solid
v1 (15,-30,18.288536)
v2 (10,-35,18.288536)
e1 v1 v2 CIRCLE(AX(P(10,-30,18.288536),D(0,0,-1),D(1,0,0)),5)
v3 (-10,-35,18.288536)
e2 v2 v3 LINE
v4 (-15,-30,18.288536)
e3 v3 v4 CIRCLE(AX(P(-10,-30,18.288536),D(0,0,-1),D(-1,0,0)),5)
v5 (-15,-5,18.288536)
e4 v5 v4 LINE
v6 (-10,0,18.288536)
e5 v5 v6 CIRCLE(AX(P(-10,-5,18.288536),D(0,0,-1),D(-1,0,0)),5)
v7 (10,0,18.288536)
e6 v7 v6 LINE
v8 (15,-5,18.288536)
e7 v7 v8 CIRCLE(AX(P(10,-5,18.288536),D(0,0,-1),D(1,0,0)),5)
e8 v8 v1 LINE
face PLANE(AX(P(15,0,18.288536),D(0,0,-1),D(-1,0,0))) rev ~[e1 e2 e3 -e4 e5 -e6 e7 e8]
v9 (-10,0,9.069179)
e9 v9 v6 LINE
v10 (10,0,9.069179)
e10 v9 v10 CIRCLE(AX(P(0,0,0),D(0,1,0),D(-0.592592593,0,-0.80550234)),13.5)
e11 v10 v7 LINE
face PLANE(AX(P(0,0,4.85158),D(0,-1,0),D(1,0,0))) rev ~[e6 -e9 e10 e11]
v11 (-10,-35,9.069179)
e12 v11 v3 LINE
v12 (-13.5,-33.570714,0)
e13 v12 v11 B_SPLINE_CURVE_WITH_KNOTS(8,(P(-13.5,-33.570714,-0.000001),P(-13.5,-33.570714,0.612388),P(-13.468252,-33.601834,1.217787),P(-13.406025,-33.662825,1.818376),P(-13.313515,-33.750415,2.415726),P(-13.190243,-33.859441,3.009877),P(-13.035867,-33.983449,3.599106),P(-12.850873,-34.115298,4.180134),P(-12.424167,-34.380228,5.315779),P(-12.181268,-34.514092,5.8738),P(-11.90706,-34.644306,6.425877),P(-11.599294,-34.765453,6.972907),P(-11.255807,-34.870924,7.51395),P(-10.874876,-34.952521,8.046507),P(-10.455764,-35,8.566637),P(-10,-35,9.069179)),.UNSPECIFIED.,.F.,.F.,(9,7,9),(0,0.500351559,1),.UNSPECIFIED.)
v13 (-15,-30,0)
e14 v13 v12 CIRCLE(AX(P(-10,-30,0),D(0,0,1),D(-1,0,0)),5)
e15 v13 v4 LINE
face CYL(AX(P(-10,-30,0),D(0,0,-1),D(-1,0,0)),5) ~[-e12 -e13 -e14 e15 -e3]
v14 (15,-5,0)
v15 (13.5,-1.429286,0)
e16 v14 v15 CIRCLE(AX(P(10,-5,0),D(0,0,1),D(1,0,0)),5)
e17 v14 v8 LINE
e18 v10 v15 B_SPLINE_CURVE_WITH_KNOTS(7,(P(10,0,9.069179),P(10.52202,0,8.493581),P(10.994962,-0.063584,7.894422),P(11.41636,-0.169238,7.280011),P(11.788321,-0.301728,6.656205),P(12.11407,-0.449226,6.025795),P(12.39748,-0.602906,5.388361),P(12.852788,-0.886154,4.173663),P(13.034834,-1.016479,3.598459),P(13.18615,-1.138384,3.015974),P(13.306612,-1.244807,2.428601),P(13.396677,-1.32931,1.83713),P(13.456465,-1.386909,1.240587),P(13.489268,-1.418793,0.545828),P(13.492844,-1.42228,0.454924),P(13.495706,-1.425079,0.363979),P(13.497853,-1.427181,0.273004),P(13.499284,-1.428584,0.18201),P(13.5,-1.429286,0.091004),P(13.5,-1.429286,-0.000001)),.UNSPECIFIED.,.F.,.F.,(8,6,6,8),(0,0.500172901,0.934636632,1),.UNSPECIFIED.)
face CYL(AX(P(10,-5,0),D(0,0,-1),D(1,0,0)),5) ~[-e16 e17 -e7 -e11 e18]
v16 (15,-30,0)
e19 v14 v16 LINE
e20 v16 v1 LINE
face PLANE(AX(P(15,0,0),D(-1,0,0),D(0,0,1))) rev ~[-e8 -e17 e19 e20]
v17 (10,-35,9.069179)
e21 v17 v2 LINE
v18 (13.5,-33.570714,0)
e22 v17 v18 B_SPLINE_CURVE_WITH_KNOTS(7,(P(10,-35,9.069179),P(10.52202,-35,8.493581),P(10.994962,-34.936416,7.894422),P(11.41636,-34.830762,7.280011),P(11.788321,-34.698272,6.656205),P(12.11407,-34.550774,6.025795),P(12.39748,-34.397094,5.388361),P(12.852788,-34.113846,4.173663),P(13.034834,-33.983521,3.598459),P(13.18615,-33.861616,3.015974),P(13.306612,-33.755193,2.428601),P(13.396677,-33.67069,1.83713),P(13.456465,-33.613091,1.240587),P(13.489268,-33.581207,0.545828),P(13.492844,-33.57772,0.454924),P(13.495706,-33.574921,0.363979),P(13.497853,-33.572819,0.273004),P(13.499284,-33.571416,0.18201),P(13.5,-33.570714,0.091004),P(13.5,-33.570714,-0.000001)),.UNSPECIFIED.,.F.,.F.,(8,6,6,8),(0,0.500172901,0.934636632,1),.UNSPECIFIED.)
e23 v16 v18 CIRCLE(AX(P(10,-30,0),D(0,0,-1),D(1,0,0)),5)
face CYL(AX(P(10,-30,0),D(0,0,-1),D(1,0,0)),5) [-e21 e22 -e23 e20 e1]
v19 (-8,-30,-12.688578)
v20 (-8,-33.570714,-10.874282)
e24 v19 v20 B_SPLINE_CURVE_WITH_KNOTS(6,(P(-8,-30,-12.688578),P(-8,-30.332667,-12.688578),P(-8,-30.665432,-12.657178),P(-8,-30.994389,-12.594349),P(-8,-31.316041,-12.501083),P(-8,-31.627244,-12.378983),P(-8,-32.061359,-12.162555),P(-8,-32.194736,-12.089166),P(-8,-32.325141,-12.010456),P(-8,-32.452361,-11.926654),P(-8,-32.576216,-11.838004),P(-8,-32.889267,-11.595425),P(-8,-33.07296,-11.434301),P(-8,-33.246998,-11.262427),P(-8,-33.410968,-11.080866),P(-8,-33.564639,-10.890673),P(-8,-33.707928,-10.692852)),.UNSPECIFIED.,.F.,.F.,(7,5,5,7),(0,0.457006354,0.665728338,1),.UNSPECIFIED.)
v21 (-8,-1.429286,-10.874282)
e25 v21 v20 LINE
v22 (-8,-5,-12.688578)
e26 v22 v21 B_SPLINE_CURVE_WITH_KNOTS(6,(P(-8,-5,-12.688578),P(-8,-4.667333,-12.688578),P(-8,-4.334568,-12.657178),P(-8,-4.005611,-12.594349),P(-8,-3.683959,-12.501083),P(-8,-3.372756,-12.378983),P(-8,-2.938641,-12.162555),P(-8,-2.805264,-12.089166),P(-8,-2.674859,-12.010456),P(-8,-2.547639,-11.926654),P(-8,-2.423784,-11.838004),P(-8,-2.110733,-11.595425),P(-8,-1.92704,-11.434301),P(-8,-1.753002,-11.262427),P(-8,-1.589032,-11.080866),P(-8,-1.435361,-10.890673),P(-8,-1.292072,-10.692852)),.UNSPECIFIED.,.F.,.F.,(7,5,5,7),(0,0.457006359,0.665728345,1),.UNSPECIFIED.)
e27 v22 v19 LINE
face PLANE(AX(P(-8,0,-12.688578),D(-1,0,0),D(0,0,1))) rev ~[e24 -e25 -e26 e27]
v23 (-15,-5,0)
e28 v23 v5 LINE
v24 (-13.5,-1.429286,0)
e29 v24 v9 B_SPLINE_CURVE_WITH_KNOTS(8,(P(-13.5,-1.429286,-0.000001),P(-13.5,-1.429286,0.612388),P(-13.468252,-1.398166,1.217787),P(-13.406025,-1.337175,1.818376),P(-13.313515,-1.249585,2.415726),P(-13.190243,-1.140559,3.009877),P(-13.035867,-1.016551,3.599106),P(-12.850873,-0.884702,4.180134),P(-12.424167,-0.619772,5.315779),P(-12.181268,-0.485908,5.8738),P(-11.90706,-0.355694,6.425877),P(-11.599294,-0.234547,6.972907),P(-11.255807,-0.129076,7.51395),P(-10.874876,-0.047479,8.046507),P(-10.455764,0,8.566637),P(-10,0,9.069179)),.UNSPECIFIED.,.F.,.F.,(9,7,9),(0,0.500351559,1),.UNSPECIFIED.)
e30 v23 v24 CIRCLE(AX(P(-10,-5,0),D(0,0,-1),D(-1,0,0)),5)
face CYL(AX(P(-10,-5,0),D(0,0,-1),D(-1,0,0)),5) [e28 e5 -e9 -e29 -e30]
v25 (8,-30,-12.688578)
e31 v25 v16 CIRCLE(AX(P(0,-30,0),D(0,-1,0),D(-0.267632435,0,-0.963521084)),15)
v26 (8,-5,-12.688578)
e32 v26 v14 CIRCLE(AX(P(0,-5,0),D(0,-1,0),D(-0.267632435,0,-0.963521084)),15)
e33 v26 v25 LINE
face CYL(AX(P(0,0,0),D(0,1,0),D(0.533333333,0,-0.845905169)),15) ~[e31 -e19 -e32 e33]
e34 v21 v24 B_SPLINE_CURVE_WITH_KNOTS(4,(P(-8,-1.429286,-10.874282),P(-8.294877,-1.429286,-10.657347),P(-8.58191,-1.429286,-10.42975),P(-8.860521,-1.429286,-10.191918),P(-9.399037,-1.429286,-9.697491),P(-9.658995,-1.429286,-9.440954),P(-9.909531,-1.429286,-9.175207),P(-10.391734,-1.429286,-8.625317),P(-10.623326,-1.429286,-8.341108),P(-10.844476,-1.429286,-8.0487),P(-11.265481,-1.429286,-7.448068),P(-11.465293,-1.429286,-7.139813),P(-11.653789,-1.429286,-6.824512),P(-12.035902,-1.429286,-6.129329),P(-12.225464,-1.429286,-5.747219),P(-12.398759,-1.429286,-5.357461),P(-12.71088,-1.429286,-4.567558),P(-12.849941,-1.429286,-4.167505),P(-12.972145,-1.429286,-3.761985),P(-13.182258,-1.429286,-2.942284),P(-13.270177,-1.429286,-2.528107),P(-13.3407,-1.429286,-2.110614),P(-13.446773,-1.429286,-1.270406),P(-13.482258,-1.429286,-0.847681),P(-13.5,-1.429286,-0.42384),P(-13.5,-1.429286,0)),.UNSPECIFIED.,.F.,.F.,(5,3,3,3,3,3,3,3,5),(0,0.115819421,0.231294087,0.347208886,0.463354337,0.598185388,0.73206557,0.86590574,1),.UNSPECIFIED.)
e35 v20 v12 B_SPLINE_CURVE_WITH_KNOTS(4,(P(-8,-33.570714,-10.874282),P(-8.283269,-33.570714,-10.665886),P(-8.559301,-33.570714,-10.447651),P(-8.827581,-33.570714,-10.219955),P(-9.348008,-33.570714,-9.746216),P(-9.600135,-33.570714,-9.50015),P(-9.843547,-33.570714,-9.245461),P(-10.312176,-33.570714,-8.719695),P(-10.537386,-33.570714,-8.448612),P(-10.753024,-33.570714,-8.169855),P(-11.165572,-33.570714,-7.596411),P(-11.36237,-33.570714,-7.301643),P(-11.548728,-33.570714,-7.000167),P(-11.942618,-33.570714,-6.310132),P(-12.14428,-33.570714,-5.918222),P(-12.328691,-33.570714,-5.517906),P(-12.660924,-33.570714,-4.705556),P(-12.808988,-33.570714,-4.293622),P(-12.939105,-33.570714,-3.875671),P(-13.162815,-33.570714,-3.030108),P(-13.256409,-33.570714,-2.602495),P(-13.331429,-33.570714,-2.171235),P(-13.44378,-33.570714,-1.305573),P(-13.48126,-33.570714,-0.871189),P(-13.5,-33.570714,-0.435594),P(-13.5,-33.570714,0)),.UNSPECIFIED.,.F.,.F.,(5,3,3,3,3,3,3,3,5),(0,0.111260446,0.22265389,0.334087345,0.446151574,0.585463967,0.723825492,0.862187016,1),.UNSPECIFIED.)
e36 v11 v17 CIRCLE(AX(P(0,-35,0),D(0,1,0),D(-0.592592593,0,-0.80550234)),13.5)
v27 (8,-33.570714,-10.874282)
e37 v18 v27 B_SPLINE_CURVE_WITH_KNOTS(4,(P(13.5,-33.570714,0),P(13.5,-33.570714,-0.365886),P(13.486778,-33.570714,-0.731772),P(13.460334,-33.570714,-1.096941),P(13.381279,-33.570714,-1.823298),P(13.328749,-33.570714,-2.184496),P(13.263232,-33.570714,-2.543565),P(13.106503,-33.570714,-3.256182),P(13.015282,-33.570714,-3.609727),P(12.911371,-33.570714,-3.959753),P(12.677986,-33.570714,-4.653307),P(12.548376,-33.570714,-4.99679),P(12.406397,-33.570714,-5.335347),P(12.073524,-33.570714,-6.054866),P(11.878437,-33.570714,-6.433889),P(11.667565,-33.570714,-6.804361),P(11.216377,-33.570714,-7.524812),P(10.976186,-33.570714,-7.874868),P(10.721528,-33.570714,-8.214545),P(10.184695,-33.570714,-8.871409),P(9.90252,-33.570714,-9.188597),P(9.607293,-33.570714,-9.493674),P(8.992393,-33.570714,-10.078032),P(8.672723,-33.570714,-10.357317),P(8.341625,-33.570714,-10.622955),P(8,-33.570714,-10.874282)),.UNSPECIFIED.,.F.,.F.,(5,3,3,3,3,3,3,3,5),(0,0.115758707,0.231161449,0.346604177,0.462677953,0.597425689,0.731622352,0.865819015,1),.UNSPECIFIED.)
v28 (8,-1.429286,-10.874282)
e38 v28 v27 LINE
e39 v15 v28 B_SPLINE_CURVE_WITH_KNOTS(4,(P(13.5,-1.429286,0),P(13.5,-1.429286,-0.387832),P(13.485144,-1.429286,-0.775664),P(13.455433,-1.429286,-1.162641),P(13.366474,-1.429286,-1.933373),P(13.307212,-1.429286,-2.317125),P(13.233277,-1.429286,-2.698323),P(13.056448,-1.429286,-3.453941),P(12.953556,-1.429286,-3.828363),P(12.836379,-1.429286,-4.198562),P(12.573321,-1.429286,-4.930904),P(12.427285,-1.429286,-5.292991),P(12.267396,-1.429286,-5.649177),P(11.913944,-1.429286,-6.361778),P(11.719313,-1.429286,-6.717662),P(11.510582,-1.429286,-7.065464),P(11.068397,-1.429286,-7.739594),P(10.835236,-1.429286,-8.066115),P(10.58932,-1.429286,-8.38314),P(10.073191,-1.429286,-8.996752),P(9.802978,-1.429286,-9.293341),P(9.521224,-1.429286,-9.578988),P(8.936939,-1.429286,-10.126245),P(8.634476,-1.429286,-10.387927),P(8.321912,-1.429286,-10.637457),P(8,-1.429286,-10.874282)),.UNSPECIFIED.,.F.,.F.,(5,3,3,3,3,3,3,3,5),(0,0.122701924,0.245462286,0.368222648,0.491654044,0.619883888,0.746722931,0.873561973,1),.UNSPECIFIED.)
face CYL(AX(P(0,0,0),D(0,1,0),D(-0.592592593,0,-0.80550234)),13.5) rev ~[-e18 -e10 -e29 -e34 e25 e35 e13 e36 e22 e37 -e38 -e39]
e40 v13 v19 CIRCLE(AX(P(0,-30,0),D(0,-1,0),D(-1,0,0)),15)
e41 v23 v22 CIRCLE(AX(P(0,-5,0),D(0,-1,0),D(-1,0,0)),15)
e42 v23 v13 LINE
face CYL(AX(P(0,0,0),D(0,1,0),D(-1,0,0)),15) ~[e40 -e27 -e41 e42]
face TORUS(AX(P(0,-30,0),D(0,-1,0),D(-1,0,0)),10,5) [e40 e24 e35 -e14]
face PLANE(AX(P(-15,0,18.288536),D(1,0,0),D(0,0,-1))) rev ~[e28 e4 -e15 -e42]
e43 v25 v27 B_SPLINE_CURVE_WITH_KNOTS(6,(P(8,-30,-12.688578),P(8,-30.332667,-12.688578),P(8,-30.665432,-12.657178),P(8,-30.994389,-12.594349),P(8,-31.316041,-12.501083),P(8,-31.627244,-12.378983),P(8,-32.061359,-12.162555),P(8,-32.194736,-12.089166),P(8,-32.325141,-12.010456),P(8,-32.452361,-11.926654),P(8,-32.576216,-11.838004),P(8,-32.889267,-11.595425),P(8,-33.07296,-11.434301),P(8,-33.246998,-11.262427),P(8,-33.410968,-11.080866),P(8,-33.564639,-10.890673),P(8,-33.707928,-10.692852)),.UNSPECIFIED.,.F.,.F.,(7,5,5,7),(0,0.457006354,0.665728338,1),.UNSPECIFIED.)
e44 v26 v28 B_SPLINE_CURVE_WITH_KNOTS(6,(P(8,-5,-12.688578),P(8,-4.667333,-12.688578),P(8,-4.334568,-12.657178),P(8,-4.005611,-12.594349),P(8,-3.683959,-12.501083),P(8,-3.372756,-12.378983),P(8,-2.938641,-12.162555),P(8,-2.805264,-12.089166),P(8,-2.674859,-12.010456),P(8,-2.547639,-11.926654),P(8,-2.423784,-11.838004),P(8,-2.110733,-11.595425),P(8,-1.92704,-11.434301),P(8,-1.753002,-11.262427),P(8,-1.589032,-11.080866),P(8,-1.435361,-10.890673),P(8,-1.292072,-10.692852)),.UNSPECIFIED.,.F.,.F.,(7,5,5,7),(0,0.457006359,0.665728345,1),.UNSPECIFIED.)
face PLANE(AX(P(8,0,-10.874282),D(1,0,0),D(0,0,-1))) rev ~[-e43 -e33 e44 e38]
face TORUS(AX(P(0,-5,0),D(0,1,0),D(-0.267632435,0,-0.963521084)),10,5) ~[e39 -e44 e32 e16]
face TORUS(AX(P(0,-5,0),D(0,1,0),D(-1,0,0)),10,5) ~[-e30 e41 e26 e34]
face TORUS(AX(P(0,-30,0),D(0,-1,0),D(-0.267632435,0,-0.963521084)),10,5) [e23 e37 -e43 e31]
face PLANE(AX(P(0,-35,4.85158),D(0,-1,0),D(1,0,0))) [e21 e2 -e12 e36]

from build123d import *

# Parameters (mm, degrees)
F1_DEPTH     = 35
F2_T1_DEPTH  = 30.7885359973
F2_T4_ANGLE  = 105.523431357
F2_T6_ANGLE  = 105.523431357
F2_T8_ANGLE  = 105.523431357
F2_T10_ANGLE = 105.523431357


# Not quite as in the source:
# - a fillet or chamfer that OpenCascade refuses, or shapes differently, is made with other operations: its cross-section is extruded or revolved along the edge and cut away or added


with BuildPart() as f1:
    # F0 (on Front) → F1 (new body)
    with BuildSketch(Plane.XZ):
        with BuildLine():
            ThreePointArc((-8, -10.8742815855), (0, 13.5), (8, -10.8742815855))
            Line((8, -10.8742815855), (8, -12.6885775404))
            ThreePointArc((8, -12.6885775404), (13.1339255366, -7.2456883731), (15, 0))
            Line((15, 0), (15, 18.2885359973))
            Line((15, 18.2885359973), (-15, 18.2885359973))
            Line((-15, 18.2885359973), (-15, 0))
            ThreePointArc((-15, 0), (-13.1339255366, -7.2456883731), (-8, -12.6885775404))
            Line((-8, -12.6885775404), (-8, -10.8742815855))
        make_face()
    extrude(amount=F1_DEPTH)

    # F2: fillet of radius 5 on 4 edges, made by hand

    # F2_s2 → F2_t1 (cut)
    with BuildSketch(Plane.XY):
        with BuildLine():
            ThreePointArc((15, -30), (13.5355339059, -33.5355339059), (10, -35))
            Line((10, -35), (15, -35))
            Line((15, -35), (15, -30))
        make_face()
        with BuildLine():
            ThreePointArc((-15, -30), (-13.5355339059, -33.5355339059), (-10, -35))
            Line((-10, -35), (-15, -35))
            Line((-15, -35), (-15, -30))
        make_face()
        with BuildLine():
            ThreePointArc((15, -5), (13.5355339059, -1.4644660941), (10, 0))
            Line((10, 0), (15, 0))
            Line((15, 0), (15, -5))
        make_face()
        with BuildLine():
            ThreePointArc((-15, -5), (-13.5355339059, -1.4644660941), (-10, 0))
            Line((-10, 0), (-15, 0))
            Line((-15, 0), (-15, -5))
        make_face()
    extrude(amount=F2_T1_DEPTH, mode=Mode.SUBTRACT)

    # F2_s3 → F2_t4 (revolve, cut)
    with BuildSketch(Plane.XY):
        with BuildLine():
            ThreePointArc((-15, -5), (-13.5355339059, -1.4644660941), (-10, 0))
            Line((-10, 0), (-15, 0))
            Line((-15, 0), (-15, -5))
        make_face()
    revolve(axis=Axis((0, 0, 0), (0, -1, 0)), revolution_arc=F2_T4_ANGLE, mode=Mode.SUBTRACT)

    # F2_s5 → F2_t6 (revolve, cut)
    with BuildSketch(Plane(origin=(0, 0, 0), x_dir=(0, 1, 0), z_dir=(-0.9635210843, 0, 0.2676324346))):
        with BuildLine():
            ThreePointArc((-5, 15), (-1.4644660941, 13.5355339059), (0, 10))
            Line((0, 10), (0, 15))
            Line((0, 15), (-5, 15))
        make_face()
    revolve(axis=Axis((0, 0, 0), (0, -1, 0)), revolution_arc=F2_T6_ANGLE, mode=Mode.SUBTRACT)

    # F2_s7 → F2_t8 (revolve, cut)
    with BuildSketch(Plane.XY):
        with BuildLine():
            ThreePointArc((-15, -30), (-13.5355339059, -33.5355339059), (-10, -35))
            Line((-10, -35), (-15, -35))
            Line((-15, -35), (-15, -30))
        make_face()
    revolve(axis=Axis((0, -35, 0), (0, -1, 0)), revolution_arc=F2_T8_ANGLE, mode=Mode.SUBTRACT)

    # F2_s9 → F2_t10 (revolve, cut)
    with BuildSketch(Plane(origin=(0, 0, 0), x_dir=(0, 1, 0), z_dir=(-0.9635210843, 0, 0.2676324346))):
        with BuildLine():
            ThreePointArc((-30, 15), (-33.5355339059, 13.5355339059), (-35, 10))
            Line((-35, 10), (-35, 15))
            Line((-35, 15), (-30, 15))
        make_face()
    revolve(axis=Axis((0, -35, 0), (0, -1, 0)), revolution_arc=F2_T10_ANGLE, mode=Mode.SUBTRACT)


solid = f1.part
